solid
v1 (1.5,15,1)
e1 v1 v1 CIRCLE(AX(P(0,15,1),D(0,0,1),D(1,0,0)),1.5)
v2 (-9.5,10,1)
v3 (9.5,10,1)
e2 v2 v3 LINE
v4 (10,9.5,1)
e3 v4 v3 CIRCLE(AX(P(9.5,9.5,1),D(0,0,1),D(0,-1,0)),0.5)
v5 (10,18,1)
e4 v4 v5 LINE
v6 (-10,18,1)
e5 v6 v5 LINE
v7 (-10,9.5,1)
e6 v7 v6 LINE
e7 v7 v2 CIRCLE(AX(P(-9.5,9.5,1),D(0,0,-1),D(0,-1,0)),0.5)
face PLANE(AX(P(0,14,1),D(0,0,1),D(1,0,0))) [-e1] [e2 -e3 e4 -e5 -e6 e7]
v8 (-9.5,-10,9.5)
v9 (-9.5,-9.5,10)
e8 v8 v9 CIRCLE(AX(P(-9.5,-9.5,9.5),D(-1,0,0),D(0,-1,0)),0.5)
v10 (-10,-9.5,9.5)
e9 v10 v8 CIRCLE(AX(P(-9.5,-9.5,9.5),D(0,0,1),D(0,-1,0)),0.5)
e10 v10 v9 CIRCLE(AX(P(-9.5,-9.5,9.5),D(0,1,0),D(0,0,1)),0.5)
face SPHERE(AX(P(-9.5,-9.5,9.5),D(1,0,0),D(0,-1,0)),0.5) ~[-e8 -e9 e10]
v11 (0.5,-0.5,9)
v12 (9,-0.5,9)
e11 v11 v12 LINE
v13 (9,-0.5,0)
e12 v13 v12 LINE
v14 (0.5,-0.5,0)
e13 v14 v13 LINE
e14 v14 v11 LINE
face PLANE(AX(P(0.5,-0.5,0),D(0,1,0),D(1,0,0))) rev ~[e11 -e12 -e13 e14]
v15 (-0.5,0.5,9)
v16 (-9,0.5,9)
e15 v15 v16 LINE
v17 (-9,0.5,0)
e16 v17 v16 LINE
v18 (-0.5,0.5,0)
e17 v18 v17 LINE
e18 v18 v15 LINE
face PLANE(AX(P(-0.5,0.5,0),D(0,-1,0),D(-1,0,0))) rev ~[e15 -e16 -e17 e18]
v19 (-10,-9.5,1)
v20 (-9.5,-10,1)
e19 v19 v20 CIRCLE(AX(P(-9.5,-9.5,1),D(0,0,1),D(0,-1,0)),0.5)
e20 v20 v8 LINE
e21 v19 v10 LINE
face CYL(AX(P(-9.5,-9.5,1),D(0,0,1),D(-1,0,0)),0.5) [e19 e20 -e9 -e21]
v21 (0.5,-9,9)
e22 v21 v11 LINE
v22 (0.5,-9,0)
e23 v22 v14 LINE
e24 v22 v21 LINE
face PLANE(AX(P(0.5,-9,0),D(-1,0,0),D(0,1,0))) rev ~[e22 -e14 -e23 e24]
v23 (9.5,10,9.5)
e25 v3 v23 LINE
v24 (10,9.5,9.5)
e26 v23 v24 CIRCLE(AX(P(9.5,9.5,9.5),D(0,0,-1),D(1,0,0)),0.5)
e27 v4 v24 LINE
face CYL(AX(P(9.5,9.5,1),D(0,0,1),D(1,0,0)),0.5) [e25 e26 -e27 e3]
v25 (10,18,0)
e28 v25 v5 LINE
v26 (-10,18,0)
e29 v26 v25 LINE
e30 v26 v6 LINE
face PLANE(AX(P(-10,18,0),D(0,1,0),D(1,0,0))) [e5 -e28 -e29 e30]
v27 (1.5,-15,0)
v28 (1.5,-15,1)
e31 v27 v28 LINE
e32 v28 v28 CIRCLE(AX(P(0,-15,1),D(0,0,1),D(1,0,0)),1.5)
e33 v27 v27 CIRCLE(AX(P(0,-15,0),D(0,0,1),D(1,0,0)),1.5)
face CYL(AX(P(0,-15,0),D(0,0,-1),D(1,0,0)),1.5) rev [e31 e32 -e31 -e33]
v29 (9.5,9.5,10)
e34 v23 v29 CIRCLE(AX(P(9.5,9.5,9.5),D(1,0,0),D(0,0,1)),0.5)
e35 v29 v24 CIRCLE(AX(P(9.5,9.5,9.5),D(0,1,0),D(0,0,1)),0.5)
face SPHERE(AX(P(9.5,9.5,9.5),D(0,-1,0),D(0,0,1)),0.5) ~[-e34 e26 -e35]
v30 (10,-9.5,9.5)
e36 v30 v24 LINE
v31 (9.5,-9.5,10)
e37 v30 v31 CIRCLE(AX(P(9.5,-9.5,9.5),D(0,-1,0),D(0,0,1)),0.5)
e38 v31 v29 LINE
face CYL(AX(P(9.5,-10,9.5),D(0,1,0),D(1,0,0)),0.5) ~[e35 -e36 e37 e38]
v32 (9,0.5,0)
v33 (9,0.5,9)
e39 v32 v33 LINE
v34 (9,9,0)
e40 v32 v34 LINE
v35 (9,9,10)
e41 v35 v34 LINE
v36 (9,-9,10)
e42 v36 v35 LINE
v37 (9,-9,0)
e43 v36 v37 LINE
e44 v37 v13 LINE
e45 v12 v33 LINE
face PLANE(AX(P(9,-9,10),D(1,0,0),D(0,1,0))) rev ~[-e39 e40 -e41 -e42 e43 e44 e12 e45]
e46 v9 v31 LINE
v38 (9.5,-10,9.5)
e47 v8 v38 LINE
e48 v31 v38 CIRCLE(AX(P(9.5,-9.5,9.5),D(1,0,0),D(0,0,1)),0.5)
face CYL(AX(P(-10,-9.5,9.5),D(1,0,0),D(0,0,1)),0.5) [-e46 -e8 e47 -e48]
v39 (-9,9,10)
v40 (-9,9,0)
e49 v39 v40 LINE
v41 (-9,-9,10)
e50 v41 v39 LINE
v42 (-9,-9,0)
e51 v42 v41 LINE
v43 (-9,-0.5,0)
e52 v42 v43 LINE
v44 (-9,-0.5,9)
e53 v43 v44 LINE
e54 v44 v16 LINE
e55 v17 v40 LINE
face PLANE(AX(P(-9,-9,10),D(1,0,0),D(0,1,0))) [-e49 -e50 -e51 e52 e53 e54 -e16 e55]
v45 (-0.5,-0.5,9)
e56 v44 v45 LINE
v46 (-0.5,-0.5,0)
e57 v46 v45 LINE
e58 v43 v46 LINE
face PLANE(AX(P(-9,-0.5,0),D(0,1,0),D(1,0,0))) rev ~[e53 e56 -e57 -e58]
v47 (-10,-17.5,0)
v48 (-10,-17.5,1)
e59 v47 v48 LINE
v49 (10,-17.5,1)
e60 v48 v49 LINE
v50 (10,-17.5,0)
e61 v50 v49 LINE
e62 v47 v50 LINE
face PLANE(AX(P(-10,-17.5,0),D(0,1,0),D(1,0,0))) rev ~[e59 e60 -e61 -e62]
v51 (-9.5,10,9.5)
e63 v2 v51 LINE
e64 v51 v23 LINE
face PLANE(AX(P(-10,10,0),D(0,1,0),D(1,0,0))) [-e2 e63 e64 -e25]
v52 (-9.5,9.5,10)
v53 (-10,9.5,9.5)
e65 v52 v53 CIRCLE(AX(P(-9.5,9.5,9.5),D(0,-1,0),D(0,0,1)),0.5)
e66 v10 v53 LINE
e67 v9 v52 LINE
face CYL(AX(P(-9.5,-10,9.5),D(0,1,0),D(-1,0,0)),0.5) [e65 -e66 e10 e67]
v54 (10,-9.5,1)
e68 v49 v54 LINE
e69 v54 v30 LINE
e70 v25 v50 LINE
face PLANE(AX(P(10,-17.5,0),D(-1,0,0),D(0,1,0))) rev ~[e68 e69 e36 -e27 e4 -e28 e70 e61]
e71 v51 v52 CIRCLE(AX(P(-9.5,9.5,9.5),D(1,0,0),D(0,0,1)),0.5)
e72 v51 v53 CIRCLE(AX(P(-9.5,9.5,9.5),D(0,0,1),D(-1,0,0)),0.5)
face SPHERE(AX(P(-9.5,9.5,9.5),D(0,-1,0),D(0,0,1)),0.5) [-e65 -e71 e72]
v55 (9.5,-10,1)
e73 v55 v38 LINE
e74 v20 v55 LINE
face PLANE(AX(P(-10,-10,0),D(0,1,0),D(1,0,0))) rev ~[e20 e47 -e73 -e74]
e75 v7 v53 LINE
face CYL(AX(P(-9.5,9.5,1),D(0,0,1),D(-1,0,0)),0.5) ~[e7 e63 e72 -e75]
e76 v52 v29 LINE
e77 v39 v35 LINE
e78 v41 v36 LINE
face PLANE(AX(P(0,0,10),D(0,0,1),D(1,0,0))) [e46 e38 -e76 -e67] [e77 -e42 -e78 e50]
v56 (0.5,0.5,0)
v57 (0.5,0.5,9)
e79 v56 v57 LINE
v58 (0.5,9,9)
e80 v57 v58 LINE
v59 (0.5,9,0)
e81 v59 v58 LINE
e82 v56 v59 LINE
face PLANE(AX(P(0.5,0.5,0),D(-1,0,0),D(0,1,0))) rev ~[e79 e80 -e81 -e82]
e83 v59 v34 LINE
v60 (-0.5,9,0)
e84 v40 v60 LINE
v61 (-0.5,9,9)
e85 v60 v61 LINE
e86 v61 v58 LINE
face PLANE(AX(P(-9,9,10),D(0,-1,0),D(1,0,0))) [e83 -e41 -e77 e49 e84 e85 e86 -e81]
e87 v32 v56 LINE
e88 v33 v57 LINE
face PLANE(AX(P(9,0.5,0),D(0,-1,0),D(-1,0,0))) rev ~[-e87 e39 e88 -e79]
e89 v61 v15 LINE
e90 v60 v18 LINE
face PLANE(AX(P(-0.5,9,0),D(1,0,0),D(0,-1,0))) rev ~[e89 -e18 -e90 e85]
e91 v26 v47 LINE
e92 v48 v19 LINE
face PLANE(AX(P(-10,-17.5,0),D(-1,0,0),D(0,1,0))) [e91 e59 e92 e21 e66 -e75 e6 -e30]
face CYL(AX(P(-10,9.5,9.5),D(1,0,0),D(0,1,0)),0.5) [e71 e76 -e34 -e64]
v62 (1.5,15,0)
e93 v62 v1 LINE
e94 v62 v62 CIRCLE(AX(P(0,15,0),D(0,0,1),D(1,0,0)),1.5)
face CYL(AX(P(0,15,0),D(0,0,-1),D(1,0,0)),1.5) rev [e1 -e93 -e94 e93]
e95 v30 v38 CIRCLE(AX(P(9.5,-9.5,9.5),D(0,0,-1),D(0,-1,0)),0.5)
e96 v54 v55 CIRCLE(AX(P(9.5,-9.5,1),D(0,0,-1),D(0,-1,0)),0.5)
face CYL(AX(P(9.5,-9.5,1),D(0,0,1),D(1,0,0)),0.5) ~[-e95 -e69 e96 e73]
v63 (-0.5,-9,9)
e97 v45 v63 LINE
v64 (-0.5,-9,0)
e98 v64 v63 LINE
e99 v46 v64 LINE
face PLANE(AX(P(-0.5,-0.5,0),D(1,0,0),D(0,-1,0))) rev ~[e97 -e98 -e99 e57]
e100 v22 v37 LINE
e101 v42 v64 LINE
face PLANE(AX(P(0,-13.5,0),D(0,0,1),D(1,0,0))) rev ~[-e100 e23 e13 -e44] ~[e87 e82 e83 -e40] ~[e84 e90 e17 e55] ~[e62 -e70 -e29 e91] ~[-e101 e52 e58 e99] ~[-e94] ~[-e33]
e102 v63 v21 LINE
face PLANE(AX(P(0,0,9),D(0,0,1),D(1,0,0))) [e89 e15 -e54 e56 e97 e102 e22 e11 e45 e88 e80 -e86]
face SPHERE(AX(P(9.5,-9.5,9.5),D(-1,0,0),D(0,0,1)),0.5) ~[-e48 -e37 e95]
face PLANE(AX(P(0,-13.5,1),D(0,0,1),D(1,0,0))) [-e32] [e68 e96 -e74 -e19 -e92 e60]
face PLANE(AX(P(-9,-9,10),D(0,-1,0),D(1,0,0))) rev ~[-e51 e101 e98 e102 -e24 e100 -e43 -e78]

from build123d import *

# Parameters (mm, degrees)
F0_W     = 20
F0_H     = 20
F1_DEPTH = 10
F2_T     = -1
F4_DEPTH = 9
F5_W     = 20
F5_H     = 8
F5_R     = 1.5
F6_DEPTH = 1
F7_W     = 18
F7_H     = 18
F8_DEPTH = 1
F9_R     = 0.5


with BuildPart() as f1:
    # F0 (on Top) → F1 (new body)
    with BuildSketch(Plane.XY):
        Rectangle(F0_W, F0_H)
    extrude(amount=F1_DEPTH)

    # F2
    f2_openings = [f1.faces().sort_by_distance(p)[0] for p in [
        (0, 0, 0),
    ]]
    offset(amount=F2_T, openings=f2_openings)

    # F3 (on Top) → F4 (join)
    with BuildSketch(Plane.XY):
        Polygon((-0.5, -9), (0.5, -9), (0.5, -0.5), (9, -0.5), (9, 0.5), (0.5, 0.5), (0.5, 9), (-0.5, 9), (-0.5, 0.5), (-9, 0.5), (-9, -0.5), (-0.5, -0.5), align=None)
    extrude(amount=F4_DEPTH)

    # F5 (on Top) → F6 (join)
    with BuildSketch(Plane.XY):
        with Locations((0, -13.5)):
            Rectangle(F5_W, F5_H)
        with Locations((0, -15)):
            Circle(F5_R, mode=Mode.SUBTRACT)
        with Locations((0, 14)):
            Rectangle(F5_W, F5_H)
        with Locations((0, 15)):
            Circle(F5_R, mode=Mode.SUBTRACT)
    extrude(amount=F6_DEPTH)

    # F7 (on face) → F8 (cut)
    with BuildSketch(Plane.XY.offset(10)):
        Rectangle(F7_W, F7_H)
    extrude(amount=-F8_DEPTH, mode=Mode.SUBTRACT)

    # F9
    f9_edges = [f1.edges().sort_by_distance(p)[0] for p in [
        (0, -10, 10),
        (10, 0, 10),
        (10, -10, 5.5),
        (-10, -10, 5.5),
        (-10, 0, 10),
        (0, 10, 10),
        (10, 10, 5.5),
        (-10, 10, 5.5),
    ]]
    fillet(f9_edges, radius=F9_R)


solid = f1.part
